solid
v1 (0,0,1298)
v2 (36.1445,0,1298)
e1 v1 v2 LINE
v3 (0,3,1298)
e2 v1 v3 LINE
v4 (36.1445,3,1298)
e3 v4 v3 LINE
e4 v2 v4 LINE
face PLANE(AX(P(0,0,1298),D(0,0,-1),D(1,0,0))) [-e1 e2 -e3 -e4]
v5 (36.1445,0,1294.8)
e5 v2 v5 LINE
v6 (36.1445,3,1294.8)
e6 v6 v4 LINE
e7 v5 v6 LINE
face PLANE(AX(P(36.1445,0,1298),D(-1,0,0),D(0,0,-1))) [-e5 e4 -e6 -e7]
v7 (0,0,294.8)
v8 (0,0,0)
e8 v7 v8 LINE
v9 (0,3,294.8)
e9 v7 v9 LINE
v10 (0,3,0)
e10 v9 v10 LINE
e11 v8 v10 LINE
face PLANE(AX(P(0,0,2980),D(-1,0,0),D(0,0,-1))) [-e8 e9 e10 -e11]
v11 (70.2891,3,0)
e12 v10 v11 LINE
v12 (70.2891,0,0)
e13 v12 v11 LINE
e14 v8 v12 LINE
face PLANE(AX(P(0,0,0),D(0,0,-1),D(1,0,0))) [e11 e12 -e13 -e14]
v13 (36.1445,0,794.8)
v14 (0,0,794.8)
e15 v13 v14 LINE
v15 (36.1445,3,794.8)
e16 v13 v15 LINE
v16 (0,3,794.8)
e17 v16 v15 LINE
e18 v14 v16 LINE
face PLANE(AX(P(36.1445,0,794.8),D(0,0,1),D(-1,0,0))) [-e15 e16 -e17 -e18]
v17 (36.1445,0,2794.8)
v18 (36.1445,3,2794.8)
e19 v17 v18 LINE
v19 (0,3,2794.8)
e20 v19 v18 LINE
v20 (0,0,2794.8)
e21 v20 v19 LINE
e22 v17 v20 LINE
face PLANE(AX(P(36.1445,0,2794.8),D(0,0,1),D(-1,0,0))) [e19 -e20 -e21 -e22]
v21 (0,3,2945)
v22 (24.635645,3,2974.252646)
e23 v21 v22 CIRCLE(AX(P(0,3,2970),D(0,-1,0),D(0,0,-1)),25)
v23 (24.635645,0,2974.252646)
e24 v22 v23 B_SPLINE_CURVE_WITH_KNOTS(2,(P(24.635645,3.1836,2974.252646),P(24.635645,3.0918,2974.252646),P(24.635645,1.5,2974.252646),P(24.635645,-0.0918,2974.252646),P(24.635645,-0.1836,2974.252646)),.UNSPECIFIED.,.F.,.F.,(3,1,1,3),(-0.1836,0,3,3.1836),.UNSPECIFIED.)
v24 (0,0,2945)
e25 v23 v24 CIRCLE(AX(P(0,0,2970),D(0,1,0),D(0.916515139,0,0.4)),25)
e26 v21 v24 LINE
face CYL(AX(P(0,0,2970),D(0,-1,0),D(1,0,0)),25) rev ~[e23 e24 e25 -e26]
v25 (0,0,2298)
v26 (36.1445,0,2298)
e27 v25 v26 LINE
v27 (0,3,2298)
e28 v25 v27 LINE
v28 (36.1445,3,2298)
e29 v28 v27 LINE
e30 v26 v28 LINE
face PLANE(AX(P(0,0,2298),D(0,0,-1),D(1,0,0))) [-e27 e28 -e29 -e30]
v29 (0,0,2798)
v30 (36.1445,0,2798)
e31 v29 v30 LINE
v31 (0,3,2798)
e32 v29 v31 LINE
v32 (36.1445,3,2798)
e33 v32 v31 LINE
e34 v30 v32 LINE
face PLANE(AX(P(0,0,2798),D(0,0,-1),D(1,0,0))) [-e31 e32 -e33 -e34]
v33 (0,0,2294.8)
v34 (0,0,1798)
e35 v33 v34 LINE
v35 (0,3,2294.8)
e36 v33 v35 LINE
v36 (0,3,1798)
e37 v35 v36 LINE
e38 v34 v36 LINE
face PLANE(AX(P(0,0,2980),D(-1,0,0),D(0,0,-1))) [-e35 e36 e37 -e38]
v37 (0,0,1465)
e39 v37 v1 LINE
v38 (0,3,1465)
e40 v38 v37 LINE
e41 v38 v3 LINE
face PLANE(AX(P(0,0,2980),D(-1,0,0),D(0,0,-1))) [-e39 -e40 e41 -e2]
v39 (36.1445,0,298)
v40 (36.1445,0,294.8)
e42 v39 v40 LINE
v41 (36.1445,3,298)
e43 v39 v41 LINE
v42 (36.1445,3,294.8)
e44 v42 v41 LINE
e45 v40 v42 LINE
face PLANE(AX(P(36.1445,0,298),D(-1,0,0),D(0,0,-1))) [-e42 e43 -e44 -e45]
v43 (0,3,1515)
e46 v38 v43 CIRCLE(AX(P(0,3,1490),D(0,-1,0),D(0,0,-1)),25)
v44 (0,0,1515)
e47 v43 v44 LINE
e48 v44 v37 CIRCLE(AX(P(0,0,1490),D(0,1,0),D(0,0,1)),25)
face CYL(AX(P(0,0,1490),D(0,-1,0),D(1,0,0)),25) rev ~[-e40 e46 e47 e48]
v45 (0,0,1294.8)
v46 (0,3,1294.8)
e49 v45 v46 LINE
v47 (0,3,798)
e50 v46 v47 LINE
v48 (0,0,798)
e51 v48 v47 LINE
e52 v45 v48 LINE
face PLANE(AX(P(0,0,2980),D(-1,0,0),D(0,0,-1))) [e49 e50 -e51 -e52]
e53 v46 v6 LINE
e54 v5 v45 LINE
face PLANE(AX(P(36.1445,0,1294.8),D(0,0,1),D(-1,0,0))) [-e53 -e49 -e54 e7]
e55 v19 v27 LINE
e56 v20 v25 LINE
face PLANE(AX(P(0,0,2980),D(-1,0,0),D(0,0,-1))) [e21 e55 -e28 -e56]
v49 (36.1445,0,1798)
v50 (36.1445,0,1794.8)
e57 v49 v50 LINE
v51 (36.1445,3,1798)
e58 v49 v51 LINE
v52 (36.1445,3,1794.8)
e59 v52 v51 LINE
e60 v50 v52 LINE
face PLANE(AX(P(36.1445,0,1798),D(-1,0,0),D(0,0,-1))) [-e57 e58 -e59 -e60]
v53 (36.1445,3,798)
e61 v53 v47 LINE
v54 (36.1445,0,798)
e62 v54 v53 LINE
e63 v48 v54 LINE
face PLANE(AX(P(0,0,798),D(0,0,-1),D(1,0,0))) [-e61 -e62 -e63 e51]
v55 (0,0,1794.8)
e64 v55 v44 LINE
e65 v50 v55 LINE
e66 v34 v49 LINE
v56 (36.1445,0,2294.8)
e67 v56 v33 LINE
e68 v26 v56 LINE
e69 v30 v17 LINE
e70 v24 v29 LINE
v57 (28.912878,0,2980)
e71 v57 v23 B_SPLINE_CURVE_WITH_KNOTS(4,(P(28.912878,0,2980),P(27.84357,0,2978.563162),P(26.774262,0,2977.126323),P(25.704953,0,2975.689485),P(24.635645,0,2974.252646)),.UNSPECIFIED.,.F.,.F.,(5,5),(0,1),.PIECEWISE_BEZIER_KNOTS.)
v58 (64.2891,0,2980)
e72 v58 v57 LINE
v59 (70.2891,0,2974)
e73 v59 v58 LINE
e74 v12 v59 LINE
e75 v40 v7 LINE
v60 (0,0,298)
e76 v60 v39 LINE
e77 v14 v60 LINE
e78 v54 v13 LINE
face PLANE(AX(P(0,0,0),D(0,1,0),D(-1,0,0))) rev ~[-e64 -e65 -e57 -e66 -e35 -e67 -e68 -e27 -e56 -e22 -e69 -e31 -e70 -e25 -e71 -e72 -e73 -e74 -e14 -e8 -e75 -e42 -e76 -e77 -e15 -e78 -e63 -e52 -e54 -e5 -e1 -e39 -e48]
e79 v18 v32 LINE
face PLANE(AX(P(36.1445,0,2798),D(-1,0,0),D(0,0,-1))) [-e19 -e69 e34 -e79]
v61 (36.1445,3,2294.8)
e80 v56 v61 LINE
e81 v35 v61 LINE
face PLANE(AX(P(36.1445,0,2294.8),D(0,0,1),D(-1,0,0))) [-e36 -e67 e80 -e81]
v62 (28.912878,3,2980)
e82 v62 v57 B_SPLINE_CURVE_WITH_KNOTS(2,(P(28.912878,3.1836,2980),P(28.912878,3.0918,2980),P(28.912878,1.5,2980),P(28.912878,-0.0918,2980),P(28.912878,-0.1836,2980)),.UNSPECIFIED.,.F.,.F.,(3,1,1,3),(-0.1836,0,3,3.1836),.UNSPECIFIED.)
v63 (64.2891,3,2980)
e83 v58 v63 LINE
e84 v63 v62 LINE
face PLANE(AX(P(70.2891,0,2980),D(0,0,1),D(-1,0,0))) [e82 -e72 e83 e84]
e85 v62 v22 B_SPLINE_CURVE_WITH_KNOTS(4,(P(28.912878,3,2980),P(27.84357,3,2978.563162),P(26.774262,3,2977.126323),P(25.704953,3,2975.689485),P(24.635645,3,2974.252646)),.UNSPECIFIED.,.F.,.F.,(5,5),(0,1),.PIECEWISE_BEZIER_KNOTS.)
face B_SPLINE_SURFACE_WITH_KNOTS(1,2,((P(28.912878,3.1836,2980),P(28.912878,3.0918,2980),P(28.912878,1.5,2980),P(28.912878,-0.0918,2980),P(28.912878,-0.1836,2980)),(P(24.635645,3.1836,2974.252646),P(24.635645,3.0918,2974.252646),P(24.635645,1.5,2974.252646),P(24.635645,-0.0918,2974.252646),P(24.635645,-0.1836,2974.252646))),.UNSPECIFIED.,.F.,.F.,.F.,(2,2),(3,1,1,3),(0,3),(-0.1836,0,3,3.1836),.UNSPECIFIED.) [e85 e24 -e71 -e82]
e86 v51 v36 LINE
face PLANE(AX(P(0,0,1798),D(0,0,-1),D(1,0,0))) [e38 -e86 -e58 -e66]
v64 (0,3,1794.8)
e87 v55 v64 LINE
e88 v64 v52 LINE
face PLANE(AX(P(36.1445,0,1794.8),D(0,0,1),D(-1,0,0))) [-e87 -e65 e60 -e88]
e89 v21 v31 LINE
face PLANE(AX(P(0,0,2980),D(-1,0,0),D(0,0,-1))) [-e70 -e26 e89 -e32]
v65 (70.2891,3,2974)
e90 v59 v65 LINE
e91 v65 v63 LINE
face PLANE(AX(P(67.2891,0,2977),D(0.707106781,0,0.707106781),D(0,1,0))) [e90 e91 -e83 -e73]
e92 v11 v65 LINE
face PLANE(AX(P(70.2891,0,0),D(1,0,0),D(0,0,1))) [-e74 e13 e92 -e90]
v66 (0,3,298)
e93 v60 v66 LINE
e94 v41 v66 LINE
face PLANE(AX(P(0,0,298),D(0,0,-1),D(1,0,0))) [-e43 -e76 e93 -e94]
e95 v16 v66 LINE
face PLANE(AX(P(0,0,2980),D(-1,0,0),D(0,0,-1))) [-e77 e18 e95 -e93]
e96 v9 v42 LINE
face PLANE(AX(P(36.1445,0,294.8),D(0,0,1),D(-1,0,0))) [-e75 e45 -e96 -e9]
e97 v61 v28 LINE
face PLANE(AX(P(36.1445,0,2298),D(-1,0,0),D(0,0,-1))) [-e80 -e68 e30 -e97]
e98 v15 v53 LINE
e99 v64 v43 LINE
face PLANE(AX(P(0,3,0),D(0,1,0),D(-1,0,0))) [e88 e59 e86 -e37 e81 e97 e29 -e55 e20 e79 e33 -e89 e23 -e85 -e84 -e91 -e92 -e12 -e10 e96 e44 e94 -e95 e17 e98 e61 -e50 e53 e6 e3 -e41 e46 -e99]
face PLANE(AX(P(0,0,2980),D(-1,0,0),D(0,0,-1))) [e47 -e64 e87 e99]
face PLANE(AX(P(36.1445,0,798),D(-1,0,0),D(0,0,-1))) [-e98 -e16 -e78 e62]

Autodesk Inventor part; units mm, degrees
ref_plane "YZ Plane" through (0, 0, 0) normal (1, 0, 0) x (0, 1, 0)
ref_plane "XZ Plane" through (0, 0, 0) normal (0, 1, 0) x (-1, 0, 0)
ref_plane "XY Plane" through (0, 0, 0) normal (0, 0, 1) x (1, 0, 0)
sketch "Sketch6" plane through (0, 0, 0) normal (0, 1, 0) x (-1, 0, 0)
  line L0 (0, 0) -> (-70.2891, 0)
  line L1 (-70.2891, 0) -> (-70.2891, 2980)
  line L2 (-70.2891, 2980) -> (0, 2980)
  line L3 (0, 2980) -> (0, 0)
  dimension "d26" = 70.2891
  dimension "d27" = 2980
extrude "Plate4" add sketch "Sketch6" along normal blind 3
sketch "Sketch9" plane through (0, 3, 0) normal (0, 1, 0) x (1, 0, 0)
  line L0 (0, -2980) -> (0, 0) projected
  line L1 (70.2891, -2980) -> (0, -2980) projected
  line L2 (70.2891, 0) -> (70.2891, -2980) projected
  line L3 (0, 0) -> (70.2891, 0) projected
  line L4 (25, -2762.0797) -> (10, -2762.0797) construction
  line L5 (10, -2762.0797) -> (10, -2562.0797) construction
  line L6 (10, -2562.0797) -> (25, -2562.0797) construction
  line L7 (25, -2562.0797) -> (25, -2762.0797) construction
  dimension "d44" = 200
  dimension "d45" = 15
  dimension "d47" = 10
mark "Mark1"
sketch "Sketch7" plane through (0, 0, 0) normal (0, -1, 0) x (1, 0, 0)
  line L0 (0, 2980) -> (70.2891, 2980) projected
  line L1 (0, 0) -> (0, 2980) projected
  line L2 (70.2891, 0) -> (0, 0) projected
  line L3 (70.2891, 2980) -> (70.2891, 0) projected
  line L4 (0, 2798) -> (36.1445, 2798)
  line L5 (36.1445, 2798) -> (36.1445, 2794.8)
  line L6 (36.1445, 2794.8) -> (0, 2794.8)
  line L7 (0, 2794.8) -> (0, 2798)
  point P0 (0, 2794.8)
  point P1 (0, 200)
  point P2 (46.4173, 200)
  point P3 (0, 2794.8)
  dimension "d29" = 36.1445
  dimension "d30" = 3.2
  dimension "d51" = 182
extrude "Extrusion2" cut sketch "Sketch7" against normal through all contours L4 L5 L6 L1
pattern_linear "Rectangular Pattern1" count 6 spacing 500 along (0, 0, -1) of "Extrusion2"
sketch "Sketch8" plane through (0, 0, 0) normal (0, -1, 0) x (1, 0, 0)
  line L0 (0, 2798) -> (36.1445, 2798) projected
  line L1 (36.1445, 2798) -> (36.1445, 2794.8) projected
  line L2 (36.1445, 2794.8) -> (0, 2794.8) projected
  line L3 (0, 0) -> (0, 294.8) projected
  line L4 (70.2891, 0) -> (0, 0) projected
  line L5 (70.2891, 2980) -> (70.2891, 0) projected
  line L6 (0, 2980) -> (70.2891, 2980) projected
  circle A0 centre (0, 1490) radius 25
  line L7 (0, 2798) -> (0, 2980) projected
  line L8 (0, 298) -> (36.1445, 298) projected
  line L9 (36.1445, 298) -> (36.1445, 294.8) projected
  line L10 (36.1445, 294.8) -> (0, 294.8) projected
  line L11 (0, 2298) -> (0, 2794.8) projected
  line L12 (0, 2298) -> (36.1445, 2298) projected
  line L13 (36.1445, 2298) -> (36.1445, 2294.8) projected
  line L14 (36.1445, 2294.8) -> (0, 2294.8) projected
  line L15 (0, 1798) -> (0, 2294.8) projected
  line L16 (0, 1798) -> (36.1445, 1798) projected
  line L17 (36.1445, 1798) -> (36.1445, 1794.8) projected
  line L18 (36.1445, 1794.8) -> (0, 1794.8) projected
  line L19 (0, 1298) -> (0, 1794.8) projected
  line L20 (0, 1298) -> (36.1445, 1298) projected
  line L21 (36.1445, 1298) -> (36.1445, 1294.8) projected
  line L22 (36.1445, 1294.8) -> (0, 1294.8) projected
  line L23 (0, 798) -> (0, 1294.8) projected
  line L24 (0, 798) -> (36.1445, 798) projected
  line L25 (36.1445, 798) -> (36.1445, 794.8) projected
  line L26 (36.1445, 794.8) -> (0, 794.8) projected
  line L27 (0, 298) -> (0, 794.8) projected
  dimension "d37" = 50
  dimension "d38" = 1490
extrude "Extrusion3" cut sketch "Sketch8" against normal through all contours L19 A0 | A0 L19
pattern_linear "Rectangular Pattern2" count 2 spacing 1480 along (0, 0, 1) of "Extrusion3"
chamfer "Corner Chamfer1" distance 6 angle 45 2 edges at (22.9129, 1.5, 2980) (70.2891, 1.5, 2980)
equation "\"d28\" = Thickness"
equation "\"BendReliefWidth\" = Thickness"
equation "\"BendReliefDepth\" = 0.5 * Thickness"
equation "\"CornerReliefSize\" = 4 * Thickness"
equation "\"MinimumRemnant\" = 2 * Thickness"
equation "\"TransitionRadius\" = BendRadius"
equation "\"JacobiRadiusSize\" = BendRadius"
equation "\"GapSize\" = Thickness"
equation "\"Thickness\" = 3"
equation "\"BendRadius\" = 5"
properties part number "BSH 0351 stringer board 3" material "09g2s"
